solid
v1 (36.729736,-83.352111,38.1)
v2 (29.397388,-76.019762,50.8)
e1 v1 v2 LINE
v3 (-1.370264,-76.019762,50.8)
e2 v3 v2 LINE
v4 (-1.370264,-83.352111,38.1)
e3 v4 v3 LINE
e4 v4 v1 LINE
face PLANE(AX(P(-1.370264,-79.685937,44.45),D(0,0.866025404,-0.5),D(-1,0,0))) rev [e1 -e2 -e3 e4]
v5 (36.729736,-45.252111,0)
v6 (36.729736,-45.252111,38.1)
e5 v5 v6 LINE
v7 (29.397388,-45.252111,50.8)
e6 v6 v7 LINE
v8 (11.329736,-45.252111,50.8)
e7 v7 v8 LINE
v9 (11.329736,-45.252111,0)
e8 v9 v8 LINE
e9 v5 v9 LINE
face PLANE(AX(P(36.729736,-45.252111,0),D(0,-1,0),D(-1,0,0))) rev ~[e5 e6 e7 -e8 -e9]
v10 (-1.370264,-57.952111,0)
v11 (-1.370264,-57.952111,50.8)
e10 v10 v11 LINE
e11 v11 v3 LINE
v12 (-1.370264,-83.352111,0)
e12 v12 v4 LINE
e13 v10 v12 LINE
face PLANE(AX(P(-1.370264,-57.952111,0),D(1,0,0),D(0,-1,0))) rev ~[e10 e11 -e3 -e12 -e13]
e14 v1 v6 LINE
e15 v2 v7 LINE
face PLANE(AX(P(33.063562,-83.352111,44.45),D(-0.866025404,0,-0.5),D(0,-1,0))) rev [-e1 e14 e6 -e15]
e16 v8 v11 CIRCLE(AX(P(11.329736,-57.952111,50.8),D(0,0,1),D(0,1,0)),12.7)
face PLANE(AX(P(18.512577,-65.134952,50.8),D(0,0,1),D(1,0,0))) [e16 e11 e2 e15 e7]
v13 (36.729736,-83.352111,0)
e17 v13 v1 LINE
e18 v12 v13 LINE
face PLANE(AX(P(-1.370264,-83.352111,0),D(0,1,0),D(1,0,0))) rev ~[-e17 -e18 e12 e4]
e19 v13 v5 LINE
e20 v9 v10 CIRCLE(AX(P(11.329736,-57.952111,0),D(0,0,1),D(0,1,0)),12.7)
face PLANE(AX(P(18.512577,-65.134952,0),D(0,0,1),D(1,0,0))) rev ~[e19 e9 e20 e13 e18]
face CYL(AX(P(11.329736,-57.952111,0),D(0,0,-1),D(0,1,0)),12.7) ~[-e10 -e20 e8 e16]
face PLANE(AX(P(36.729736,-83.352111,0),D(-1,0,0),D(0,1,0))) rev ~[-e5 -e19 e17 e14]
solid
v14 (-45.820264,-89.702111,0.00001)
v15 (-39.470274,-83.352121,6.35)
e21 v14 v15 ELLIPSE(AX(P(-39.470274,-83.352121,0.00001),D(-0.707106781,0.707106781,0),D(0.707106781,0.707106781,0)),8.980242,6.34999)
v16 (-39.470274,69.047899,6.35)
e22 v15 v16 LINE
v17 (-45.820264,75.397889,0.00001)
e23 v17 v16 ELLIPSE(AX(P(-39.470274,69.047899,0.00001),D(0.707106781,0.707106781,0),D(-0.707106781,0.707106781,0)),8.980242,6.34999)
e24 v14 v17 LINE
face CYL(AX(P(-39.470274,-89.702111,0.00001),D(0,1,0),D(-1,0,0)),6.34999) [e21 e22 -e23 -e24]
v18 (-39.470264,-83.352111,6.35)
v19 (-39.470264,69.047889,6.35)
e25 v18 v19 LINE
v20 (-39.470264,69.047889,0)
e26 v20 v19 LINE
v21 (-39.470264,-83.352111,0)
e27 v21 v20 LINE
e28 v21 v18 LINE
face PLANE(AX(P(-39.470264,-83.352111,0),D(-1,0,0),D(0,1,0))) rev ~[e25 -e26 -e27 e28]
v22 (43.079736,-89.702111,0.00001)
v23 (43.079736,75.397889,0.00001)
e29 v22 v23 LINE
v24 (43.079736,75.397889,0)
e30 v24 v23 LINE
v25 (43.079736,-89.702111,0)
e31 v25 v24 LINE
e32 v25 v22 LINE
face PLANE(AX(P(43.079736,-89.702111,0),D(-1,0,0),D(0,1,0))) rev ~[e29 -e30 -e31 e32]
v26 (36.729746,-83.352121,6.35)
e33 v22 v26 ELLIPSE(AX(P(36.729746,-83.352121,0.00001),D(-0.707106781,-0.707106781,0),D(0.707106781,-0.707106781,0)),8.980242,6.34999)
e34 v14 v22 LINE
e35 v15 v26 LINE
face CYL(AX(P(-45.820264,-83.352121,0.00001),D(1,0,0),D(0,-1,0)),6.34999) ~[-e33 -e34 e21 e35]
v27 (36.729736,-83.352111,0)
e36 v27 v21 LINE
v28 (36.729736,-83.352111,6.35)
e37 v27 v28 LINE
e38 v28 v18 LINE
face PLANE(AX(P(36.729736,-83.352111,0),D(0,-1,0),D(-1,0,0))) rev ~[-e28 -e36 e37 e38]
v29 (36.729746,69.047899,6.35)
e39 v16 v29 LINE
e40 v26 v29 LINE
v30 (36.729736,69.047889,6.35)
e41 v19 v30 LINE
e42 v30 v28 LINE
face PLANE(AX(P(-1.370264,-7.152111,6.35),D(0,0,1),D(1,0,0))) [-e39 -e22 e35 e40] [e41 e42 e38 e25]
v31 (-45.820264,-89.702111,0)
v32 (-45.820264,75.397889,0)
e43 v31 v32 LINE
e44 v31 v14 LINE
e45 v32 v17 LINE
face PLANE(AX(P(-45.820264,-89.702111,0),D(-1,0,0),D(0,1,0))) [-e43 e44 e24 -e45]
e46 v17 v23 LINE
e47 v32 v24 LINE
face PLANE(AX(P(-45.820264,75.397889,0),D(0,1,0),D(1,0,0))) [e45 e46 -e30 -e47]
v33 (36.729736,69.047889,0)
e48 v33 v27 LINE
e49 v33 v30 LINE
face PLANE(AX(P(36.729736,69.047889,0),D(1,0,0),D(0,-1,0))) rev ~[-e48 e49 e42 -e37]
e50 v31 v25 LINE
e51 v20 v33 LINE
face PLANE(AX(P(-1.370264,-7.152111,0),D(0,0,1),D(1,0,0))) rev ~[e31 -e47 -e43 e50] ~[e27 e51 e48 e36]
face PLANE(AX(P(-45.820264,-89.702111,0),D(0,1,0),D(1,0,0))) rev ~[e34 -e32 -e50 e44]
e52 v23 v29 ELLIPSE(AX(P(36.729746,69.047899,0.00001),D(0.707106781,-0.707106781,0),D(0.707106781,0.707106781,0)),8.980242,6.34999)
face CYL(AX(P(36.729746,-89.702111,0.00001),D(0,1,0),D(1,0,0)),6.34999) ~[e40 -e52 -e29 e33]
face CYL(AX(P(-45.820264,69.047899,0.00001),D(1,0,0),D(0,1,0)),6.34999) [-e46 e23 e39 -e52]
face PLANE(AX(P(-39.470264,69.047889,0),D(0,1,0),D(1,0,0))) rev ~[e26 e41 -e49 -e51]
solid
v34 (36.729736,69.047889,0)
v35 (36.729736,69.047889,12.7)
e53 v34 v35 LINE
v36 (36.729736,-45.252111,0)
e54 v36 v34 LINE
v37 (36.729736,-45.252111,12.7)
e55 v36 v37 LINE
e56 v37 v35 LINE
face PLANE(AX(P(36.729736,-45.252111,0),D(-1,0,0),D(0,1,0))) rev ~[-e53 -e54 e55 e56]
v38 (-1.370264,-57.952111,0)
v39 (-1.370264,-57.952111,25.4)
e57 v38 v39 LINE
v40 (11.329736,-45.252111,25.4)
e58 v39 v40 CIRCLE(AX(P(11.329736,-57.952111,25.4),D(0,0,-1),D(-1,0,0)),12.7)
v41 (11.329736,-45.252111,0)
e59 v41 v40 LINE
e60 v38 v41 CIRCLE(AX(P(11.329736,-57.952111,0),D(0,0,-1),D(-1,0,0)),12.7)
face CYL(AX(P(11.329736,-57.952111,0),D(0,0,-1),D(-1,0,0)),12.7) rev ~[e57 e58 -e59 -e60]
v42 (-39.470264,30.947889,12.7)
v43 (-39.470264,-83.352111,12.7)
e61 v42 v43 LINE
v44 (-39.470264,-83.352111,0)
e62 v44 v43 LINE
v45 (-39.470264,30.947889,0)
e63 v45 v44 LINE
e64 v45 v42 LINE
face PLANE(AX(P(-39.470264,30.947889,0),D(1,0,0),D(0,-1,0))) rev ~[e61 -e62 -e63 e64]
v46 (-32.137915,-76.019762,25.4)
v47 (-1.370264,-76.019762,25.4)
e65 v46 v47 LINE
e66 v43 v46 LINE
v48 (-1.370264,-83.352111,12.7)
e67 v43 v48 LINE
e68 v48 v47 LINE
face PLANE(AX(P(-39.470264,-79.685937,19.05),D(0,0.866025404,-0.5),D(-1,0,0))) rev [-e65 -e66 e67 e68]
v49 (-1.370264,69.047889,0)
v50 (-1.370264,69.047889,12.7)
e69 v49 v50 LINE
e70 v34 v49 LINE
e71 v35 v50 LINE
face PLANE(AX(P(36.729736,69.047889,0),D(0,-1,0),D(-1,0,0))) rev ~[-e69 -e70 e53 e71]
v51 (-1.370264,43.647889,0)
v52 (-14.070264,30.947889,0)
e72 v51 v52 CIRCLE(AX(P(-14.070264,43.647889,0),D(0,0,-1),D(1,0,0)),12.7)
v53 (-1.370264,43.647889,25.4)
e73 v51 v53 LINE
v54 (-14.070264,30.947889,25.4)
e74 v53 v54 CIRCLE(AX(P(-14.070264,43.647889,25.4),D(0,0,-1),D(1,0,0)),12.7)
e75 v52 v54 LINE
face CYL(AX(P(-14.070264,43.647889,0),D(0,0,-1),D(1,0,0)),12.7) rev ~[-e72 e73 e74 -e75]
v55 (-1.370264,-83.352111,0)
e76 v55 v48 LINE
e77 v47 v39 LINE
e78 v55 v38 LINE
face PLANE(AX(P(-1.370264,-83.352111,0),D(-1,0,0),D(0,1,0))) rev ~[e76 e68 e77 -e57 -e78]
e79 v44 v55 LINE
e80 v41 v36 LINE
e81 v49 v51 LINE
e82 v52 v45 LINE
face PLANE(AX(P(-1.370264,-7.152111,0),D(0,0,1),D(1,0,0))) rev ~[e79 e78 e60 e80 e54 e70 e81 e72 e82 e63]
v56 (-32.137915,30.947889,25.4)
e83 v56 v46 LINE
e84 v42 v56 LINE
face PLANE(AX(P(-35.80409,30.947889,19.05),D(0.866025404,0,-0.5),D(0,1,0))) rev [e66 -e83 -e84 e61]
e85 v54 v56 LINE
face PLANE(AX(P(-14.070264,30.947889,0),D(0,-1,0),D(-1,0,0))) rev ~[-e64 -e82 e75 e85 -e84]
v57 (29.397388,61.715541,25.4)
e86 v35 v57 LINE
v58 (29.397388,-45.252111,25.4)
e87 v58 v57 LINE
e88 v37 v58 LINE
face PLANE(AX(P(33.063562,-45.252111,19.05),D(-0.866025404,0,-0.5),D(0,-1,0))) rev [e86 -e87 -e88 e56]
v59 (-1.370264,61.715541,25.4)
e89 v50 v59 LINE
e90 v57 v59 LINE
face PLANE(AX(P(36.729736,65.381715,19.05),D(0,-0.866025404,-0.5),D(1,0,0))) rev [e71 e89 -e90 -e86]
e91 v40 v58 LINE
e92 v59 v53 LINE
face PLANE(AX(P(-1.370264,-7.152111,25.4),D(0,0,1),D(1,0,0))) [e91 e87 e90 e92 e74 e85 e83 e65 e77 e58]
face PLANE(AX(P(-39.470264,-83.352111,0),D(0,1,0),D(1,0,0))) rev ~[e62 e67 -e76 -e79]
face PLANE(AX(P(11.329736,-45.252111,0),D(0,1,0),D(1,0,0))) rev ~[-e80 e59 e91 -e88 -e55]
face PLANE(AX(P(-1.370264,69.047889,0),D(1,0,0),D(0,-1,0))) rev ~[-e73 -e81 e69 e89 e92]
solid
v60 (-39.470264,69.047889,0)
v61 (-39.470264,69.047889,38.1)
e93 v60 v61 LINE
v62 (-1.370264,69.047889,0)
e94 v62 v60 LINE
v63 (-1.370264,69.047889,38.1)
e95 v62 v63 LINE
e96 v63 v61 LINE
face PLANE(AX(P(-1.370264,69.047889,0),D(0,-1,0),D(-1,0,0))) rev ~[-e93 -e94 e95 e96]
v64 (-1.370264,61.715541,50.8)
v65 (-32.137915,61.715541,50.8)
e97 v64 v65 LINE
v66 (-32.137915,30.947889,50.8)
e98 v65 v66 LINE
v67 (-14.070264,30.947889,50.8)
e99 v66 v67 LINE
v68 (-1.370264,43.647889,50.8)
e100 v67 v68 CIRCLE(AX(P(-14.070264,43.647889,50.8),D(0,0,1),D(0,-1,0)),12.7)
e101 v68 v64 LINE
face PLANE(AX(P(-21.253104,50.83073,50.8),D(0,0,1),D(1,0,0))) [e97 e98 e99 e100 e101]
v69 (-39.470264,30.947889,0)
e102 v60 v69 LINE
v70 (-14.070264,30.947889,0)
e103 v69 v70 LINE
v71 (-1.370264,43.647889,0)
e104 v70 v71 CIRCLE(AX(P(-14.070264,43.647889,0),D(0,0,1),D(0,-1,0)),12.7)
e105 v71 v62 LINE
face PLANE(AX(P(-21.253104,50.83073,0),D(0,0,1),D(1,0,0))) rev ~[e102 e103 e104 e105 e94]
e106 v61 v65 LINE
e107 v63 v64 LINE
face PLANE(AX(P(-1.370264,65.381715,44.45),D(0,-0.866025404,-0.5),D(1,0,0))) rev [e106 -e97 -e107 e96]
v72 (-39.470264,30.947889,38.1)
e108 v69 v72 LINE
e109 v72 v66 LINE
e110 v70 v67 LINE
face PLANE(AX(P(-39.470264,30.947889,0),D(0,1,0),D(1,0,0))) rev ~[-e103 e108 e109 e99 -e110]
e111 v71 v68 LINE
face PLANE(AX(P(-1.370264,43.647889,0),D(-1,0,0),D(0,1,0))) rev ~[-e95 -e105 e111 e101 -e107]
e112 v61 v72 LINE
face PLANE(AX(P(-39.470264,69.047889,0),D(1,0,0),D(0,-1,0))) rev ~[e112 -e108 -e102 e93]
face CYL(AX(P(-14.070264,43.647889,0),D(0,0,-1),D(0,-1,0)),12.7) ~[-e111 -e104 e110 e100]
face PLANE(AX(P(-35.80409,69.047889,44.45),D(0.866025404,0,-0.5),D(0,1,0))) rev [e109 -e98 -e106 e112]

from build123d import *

# Parameters (mm, degrees)
F0_W       = 88.9
F0_H       = 165.1
F1_DEPTH   = 6.35
F2_DEPTH   = 25.4
F3_DEPTH   = 50.8
F4_R       = 6.34999
F5_SIZE2   = 7.3323484187
F5_SIZE    = 12.7
F5_2_SIZE2 = 7.3323484187
F5_2_SIZE  = 12.7
F6_SIZE2   = 7.3323484187
F6_SIZE    = 12.7


# Not quite as in the source:
# - a fillet or chamfer is up to 0.001 mm smaller than in the source, because OpenCascade refuses the exact size


with BuildPart() as f1:
    # F0 (on Top) → F1 (new body)
    with BuildSketch(Plane.XY):
        with Locations((-1.3702638615, -7.1521108847)):
            Rectangle(F0_W, F0_H)
        Polygon((-1.3702638615, -83.3521108847), (-39.4702638615, -83.3521108847), (-39.4702638615, 30.9478891153), (-39.4702638615, 69.0478891153), (-1.3702638615, 69.0478891153), (36.7297361385, 69.0478891153), (36.7297361385, -45.2521108847), (36.7297361385, -83.3521108847), align=None, mode=Mode.SUBTRACT)
    extrude(amount=F1_DEPTH)

    # F4 (radius 6.35 in the source; OpenCascade refuses exactly that, so slightly less here)
    f4_edges = [f1.edges().sort_by_distance(p)[0] for p in [
        (-1.370264, -89.702111, 6.35),
        (43.079736, -7.152111, 6.35),
        (-45.820264, -7.152111, 6.35),
        (-1.370264, 75.397889, 6.35),
    ]]
    fillet(f4_edges, radius=F4_R)


with BuildPart() as f2:
    # F0 (on Top) → F2 (new body)
    with BuildSketch(Plane.XY):
        with BuildLine():
            Line((-39.4702638615, 30.9478891153), (-39.4702638615, -83.3521108847))
            Line((-39.4702638615, -83.3521108847), (-1.3702638615, -83.3521108847))
            Line((-1.3702638615, -83.3521108847), (-1.3702638615, -57.9521108847))
            ThreePointArc((-1.3702638615, -57.9521108847), (2.3494800174, -48.9718547636), (11.3297361385, -45.2521108847))
            Line((11.3297361385, -45.2521108847), (36.7297361385, -45.2521108847))
            Line((36.7297361385, -45.2521108847), (36.7297361385, 69.0478891153))
            Line((36.7297361385, 69.0478891153), (-1.3702638615, 69.0478891153))
            Line((-1.3702638615, 69.0478891153), (-1.3702638615, 43.6478891153))
            ThreePointArc((-1.3702638615, 43.6478891153), (-5.0900077404, 34.6676329943), (-14.0702638615, 30.9478891153))
            Line((-14.0702638615, 30.9478891153), (-39.4702638615, 30.9478891153))
        make_face()
    extrude(amount=F2_DEPTH)

    # F5#2
    f5_2_edges = [f2.edges().sort_by_distance(p)[0] for p in [
        (36.729736, 11.897889, 25.4),
        (17.679736, 69.047889, 25.4),
        (-39.470264, -26.202111, 25.4),
        (-20.420264, -83.352111, 25.4),
    ]]
    chamfer(f5_2_edges, length=F5_2_SIZE, length2=F5_2_SIZE2)


with BuildPart() as f3:
    # F0 (on Top) → F3 (new body)
    with BuildSketch(Plane.XY):
        with BuildLine():
            Line((-39.4702638615, 69.0478891153), (-39.4702638615, 30.9478891153))
            Line((-39.4702638615, 30.9478891153), (-14.0702638615, 30.9478891153))
            ThreePointArc((-14.0702638615, 30.9478891153), (-5.0900077404, 34.6676329943), (-1.3702638615, 43.6478891153))
            Line((-1.3702638615, 43.6478891153), (-1.3702638615, 69.0478891153))
            Line((-1.3702638615, 69.0478891153), (-39.4702638615, 69.0478891153))
        make_face()
    extrude(amount=F3_DEPTH)

    # F6
    f6_edges = [f3.edges().sort_by_distance(p)[0] for p in [
        (-20.420264, 69.047889, 50.8),
        (-39.470264, 49.997889, 50.8),
    ]]
    chamfer(f6_edges, length=F6_SIZE, length2=F6_SIZE2)


with BuildPart() as f3b:
    # F0 (on Top) → F3, piece 2 (new body)
    with BuildSketch(Plane.XY):
        with BuildLine():
            Line((-1.3702638615, -57.9521108847), (-1.3702638615, -83.3521108847))
            Line((-1.3702638615, -83.3521108847), (36.7297361385, -83.3521108847))
            Line((36.7297361385, -83.3521108847), (36.7297361385, -45.2521108847))
            Line((36.7297361385, -45.2521108847), (11.3297361385, -45.2521108847))
            ThreePointArc((11.3297361385, -45.2521108847), (2.3494800174, -48.9718547636), (-1.3702638615, -57.9521108847))
        make_face()
    extrude(amount=F3_DEPTH)

    # F5
    f5_edges = [f3b.edges().sort_by_distance(p)[0] for p in [
        (17.679736, -83.352111, 50.8),
        (36.729736, -64.302111, 50.8),
    ]]
    chamfer(f5_edges, length=F5_SIZE, length2=F5_SIZE2)


solid = Compound([f1.part, f2.part, f3.part, f3b.part])
